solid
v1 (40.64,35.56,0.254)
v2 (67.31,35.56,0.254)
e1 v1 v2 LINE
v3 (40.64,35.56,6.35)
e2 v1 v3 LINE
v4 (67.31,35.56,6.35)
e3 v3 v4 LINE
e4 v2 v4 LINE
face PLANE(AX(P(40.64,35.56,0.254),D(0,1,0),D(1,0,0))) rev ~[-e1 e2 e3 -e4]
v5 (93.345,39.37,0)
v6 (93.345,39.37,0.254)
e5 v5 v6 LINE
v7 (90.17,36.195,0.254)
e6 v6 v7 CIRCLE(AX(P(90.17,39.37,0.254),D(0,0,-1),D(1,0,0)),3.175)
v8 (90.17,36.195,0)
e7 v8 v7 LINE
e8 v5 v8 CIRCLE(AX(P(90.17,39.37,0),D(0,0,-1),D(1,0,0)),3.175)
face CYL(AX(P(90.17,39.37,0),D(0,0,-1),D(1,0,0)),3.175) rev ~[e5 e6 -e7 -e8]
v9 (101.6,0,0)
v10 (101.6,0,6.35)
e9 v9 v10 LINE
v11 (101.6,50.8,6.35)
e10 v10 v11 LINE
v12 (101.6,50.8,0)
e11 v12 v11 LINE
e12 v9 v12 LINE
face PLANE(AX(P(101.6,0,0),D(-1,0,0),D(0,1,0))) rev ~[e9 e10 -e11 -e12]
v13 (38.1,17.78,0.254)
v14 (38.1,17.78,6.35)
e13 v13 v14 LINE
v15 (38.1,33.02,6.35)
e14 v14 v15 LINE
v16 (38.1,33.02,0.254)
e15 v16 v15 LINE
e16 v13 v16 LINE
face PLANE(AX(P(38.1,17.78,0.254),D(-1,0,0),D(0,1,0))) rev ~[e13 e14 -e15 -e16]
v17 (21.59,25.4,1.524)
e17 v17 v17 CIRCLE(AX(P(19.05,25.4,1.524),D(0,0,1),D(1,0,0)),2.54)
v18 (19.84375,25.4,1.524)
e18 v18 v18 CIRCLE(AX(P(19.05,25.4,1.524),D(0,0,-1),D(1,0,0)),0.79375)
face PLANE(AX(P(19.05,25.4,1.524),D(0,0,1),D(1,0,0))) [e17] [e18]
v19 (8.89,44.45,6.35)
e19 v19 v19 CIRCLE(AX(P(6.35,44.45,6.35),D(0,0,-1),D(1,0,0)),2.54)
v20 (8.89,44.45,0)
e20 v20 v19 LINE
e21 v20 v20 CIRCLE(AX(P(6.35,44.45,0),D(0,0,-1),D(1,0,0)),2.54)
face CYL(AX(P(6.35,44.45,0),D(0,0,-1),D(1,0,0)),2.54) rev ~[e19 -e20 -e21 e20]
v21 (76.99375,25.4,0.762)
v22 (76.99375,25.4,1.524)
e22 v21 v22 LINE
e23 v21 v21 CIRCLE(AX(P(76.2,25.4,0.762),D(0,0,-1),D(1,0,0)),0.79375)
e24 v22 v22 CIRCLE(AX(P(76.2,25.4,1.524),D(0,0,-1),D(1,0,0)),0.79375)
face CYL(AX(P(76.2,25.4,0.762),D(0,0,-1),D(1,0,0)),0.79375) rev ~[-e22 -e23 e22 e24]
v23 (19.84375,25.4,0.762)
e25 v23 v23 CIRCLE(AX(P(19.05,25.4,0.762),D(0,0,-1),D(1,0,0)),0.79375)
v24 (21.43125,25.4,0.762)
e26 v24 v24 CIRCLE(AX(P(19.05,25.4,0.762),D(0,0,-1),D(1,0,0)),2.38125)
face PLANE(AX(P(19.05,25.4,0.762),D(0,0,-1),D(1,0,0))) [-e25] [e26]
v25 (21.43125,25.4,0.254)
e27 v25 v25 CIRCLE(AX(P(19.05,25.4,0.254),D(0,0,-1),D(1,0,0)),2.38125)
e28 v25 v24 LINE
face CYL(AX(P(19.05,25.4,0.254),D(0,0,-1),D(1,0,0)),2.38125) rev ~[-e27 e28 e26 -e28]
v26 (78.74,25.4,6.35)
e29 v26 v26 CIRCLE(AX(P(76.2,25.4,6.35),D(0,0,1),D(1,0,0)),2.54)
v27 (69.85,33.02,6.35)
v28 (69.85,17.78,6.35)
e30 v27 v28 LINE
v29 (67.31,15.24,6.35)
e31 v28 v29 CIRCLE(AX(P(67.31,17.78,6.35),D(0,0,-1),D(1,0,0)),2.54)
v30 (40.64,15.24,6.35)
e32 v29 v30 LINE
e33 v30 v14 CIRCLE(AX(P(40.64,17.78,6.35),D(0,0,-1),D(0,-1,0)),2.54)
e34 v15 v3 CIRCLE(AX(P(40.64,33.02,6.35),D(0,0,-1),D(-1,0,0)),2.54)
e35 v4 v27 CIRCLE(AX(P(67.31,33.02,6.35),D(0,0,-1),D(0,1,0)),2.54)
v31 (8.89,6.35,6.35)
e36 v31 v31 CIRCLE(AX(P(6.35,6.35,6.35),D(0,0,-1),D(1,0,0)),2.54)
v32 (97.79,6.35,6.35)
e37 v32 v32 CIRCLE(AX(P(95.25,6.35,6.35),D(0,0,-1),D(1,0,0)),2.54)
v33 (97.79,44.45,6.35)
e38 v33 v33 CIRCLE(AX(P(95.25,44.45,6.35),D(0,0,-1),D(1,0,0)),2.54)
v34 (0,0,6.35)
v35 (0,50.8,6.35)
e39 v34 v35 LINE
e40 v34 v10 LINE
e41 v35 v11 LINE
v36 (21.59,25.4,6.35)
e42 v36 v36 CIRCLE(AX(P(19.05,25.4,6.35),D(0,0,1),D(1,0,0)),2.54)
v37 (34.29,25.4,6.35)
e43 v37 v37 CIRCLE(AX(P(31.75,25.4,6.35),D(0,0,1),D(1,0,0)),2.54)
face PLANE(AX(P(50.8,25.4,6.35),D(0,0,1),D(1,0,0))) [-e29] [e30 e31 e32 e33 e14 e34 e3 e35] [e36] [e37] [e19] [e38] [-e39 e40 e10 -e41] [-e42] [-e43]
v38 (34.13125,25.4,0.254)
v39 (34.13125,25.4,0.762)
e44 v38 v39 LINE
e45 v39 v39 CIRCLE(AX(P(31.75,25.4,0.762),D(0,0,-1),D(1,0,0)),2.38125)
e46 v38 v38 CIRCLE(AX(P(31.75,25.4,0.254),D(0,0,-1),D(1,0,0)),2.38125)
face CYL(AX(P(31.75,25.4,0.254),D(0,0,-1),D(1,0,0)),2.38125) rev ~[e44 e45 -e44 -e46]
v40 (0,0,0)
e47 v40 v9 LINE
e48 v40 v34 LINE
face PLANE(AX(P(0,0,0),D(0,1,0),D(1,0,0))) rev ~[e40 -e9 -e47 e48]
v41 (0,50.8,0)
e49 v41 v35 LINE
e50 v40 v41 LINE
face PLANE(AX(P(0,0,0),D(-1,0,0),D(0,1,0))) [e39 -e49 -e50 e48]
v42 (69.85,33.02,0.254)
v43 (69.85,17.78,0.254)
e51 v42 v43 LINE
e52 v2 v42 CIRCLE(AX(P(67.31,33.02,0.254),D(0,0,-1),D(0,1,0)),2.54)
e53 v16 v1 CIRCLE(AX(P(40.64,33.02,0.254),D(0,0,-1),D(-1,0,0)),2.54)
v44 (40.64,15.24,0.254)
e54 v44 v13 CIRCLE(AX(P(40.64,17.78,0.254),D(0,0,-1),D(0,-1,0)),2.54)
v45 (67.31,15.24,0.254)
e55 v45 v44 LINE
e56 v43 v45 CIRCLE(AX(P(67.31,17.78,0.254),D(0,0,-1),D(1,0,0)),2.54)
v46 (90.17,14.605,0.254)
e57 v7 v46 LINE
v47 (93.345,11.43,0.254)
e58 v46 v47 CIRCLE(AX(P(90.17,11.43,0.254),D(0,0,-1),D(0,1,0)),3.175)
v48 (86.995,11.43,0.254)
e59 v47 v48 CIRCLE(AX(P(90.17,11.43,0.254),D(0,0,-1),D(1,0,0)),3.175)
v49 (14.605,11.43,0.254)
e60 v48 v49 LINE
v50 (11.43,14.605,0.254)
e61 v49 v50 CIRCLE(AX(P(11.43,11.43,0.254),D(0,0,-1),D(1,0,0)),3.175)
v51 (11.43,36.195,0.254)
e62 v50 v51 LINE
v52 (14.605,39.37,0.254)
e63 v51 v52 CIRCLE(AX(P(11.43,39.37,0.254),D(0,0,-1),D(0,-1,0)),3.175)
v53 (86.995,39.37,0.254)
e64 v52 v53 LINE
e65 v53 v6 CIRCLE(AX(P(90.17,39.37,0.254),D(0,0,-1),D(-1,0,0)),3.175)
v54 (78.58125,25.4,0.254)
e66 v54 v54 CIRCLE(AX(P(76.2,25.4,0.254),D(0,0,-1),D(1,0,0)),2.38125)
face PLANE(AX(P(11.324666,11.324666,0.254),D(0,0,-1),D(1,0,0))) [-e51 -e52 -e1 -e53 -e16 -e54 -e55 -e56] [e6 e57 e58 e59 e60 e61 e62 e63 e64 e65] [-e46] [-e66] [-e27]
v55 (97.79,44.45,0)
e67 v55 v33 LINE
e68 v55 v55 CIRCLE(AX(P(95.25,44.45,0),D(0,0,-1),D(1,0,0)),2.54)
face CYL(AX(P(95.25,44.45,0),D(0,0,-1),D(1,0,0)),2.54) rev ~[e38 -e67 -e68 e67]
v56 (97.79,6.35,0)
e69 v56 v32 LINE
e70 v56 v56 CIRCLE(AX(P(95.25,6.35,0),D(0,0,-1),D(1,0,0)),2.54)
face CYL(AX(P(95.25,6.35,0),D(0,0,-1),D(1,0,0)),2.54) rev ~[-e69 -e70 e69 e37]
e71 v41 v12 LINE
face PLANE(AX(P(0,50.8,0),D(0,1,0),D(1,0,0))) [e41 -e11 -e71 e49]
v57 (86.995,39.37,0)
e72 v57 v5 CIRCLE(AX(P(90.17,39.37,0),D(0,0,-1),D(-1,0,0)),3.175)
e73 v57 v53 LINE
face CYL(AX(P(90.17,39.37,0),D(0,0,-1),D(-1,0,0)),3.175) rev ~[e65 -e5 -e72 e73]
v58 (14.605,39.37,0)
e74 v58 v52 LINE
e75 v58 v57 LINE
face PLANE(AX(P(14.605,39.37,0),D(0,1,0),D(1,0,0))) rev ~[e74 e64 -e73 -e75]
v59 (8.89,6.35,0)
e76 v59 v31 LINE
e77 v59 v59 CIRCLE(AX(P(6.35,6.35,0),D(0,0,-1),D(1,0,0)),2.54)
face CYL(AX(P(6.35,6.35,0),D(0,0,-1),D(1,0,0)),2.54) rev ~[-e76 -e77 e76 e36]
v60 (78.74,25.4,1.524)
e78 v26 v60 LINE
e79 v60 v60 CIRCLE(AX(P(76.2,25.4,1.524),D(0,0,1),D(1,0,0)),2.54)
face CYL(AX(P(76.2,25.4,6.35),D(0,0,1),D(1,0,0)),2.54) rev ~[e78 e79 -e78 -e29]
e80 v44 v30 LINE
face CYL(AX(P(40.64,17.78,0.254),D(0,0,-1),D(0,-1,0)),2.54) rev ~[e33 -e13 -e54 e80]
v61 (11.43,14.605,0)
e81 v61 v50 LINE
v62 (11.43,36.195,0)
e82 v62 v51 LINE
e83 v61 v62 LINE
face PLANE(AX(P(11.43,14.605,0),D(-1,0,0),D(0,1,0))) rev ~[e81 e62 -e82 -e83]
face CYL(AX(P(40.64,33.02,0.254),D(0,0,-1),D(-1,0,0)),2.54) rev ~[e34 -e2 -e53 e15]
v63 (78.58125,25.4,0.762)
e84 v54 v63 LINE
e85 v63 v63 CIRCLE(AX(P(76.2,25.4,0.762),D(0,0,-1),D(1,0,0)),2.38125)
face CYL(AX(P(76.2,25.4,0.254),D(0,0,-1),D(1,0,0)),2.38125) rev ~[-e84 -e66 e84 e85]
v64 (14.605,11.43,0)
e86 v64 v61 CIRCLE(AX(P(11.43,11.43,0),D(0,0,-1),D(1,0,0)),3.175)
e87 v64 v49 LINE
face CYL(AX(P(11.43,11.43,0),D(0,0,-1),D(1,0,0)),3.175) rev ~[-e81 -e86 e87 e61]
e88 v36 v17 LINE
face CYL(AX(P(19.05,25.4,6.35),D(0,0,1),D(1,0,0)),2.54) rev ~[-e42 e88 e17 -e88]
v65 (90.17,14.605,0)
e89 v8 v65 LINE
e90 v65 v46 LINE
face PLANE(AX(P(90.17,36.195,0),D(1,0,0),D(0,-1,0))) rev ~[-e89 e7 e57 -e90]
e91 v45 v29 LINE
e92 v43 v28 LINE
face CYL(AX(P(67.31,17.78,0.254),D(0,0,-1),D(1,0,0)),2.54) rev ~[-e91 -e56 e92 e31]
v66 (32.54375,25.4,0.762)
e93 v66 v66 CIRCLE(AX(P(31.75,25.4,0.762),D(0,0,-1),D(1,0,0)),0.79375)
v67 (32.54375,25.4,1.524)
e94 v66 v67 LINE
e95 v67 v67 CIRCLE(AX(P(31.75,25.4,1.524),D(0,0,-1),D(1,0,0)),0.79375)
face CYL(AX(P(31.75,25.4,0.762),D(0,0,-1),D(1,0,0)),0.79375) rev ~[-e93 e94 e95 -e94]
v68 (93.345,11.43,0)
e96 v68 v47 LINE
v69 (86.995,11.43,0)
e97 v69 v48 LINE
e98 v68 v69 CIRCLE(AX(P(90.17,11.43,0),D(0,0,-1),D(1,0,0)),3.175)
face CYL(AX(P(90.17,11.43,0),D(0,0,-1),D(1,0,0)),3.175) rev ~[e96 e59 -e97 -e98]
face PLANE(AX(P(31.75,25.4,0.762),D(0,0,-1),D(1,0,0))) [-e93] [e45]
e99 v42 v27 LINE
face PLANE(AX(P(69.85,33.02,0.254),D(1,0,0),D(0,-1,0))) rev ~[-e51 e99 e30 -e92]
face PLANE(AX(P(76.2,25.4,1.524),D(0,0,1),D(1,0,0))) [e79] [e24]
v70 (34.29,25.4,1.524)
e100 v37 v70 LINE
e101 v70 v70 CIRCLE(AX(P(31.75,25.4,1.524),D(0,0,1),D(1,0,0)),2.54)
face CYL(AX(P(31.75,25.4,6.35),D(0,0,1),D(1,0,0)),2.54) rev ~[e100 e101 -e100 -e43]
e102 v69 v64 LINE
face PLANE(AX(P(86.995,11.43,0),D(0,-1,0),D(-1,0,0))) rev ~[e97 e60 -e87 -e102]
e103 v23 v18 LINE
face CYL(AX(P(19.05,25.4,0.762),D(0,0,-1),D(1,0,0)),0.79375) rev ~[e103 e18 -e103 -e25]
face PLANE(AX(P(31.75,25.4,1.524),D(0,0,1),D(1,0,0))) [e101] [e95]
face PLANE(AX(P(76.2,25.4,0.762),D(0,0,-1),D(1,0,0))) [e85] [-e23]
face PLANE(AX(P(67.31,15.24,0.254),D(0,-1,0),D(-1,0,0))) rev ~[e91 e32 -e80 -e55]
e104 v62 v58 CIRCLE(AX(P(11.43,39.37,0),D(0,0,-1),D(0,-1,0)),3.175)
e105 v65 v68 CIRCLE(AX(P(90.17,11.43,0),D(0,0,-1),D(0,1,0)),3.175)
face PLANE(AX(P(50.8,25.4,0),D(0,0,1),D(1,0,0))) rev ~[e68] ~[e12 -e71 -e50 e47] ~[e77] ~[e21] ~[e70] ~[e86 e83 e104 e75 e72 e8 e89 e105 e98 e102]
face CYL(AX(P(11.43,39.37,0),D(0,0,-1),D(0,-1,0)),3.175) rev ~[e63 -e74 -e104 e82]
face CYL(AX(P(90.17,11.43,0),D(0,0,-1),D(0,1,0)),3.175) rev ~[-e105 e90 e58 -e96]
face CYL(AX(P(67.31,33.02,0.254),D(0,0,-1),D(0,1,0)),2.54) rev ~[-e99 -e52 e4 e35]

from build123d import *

# Parameters (mm, degrees)
F0_W      = 101.6
F0_H      = 50.8
F1_DEPTH  = 6.35
F3_DEPTH  = 0.254
F4_R      = 2.54
F5_DEPTH  = 6.351
F6_R      = 2.38125
F7_DEPTH  = 0.508
F8_R      = 0.79375
F9_DEPTH  = 1.27
F10_R     = 2.54
F11_DEPTH = 4.826
F13_DEPTH = 6.096


# Not quite as in the source:
# - a feature names something its author has since deleted; it is built from what else it names


with BuildPart() as f1:
    # F0 (on Top) → F1 (new body)
    with BuildSketch(Plane.XY):
        with Locations((50.8, 25.4)):
            Rectangle(F0_W, F0_H)
    extrude(amount=F1_DEPTH)

    # F2 (on face) → F3 (cut)
    with BuildSketch(Plane(origin=(0, 0, 0), x_dir=(1, 0, 0), z_dir=(0, 0, -1))):
        with BuildLine():
            Line((11.43, -14.605), (11.43, -11.43))
            Line((11.43, -11.43), (14.605, -11.43))
            ThreePointArc((14.605, -11.43), (9.1849359697, -9.1849359697), (11.43, -14.605))
        make_face()
        with BuildLine():
            Line((14.605, -11.43), (11.43, -11.43))
            Line((11.43, -11.43), (11.43, -14.605))
            ThreePointArc((11.43, -14.605), (13.6750640303, -13.6750640303), (14.605, -11.43))
        make_face()
        with BuildLine():
            Line((86.995, -11.43), (14.605, -11.43))
            ThreePointArc((14.605, -11.43), (13.6750640303, -13.6750640303), (11.43, -14.605))
            Line((11.43, -14.605), (11.43, -36.195))
            ThreePointArc((11.43, -36.195), (13.6750640303, -37.1249359697), (14.605, -39.37))
            Line((14.605, -39.37), (86.995, -39.37))
            ThreePointArc((86.995, -39.37), (87.9249359697, -37.1249359697), (90.17, -36.195))
            Line((90.17, -36.195), (90.17, -14.605))
            ThreePointArc((90.17, -14.605), (87.9249359697, -13.6750640303), (86.995, -11.43))
        make_face()
        with BuildLine():
            ThreePointArc((93.345, -11.43), (90.17, -8.255), (86.995, -11.43))
            Line((86.995, -11.43), (90.17, -11.43))
            Line((90.17, -11.43), (90.17, -14.605))
            ThreePointArc((90.17, -14.605), (92.4150640303, -13.6750640303), (93.345, -11.43))
        make_face()
        with BuildLine():
            Line((90.17, -11.43), (86.995, -11.43))
            ThreePointArc((86.995, -11.43), (87.9249359697, -13.6750640303), (90.17, -14.605))
            Line((90.17, -14.605), (90.17, -11.43))
        make_face()
        with BuildLine():
            ThreePointArc((14.605, -39.37), (13.6750640303, -37.1249359697), (11.43, -36.195))
            Line((11.43, -36.195), (11.43, -39.37))
            Line((11.43, -39.37), (14.605, -39.37))
        make_face()
        with BuildLine():
            Line((11.43, -39.37), (11.43, -36.195))
            ThreePointArc((11.43, -36.195), (9.1849359697, -41.6150640303), (14.605, -39.37))
            Line((14.605, -39.37), (11.43, -39.37))
        make_face()
        with BuildLine():
            ThreePointArc((93.345, -39.37), (92.4150640303, -37.1249359697), (90.17, -36.195))
            Line((90.17, -36.195), (90.17, -39.37))
            Line((90.17, -39.37), (86.995, -39.37))
            ThreePointArc((86.995, -39.37), (90.17, -42.545), (93.345, -39.37))
        make_face()
        with BuildLine():
            Line((90.17, -39.37), (90.17, -36.195))
            ThreePointArc((90.17, -36.195), (87.9249359697, -37.1249359697), (86.995, -39.37))
            Line((86.995, -39.37), (90.17, -39.37))
        make_face()
    extrude(amount=-F3_DEPTH, mode=Mode.SUBTRACT)

    # F4 (on face) → F5 (cut, through all)
    with BuildSketch(Plane(origin=(0, 0, 0), x_dir=(1, 0, 0), z_dir=(0, 0, -1))):
        with Locations((95.25, -6.35)):
            Circle(F4_R)
        with Locations((6.35, -6.35)):
            Circle(F4_R)
        with Locations((6.35, -44.45)):
            Circle(F4_R)
        with Locations((95.25, -44.45)):
            Circle(F4_R)
    extrude(amount=-F5_DEPTH, mode=Mode.SUBTRACT)

    # F6 (on face) → F7 (cut)
    with BuildSketch(Plane(origin=(0, 0, 0.254), x_dir=(1, 0, 0), z_dir=(0, 0, -1))):
        with Locations((31.75, -25.4)):
            Circle(F6_R)
        with Locations((19.05, -25.4)):
            Circle(F6_R)
        with Locations((76.2, -25.4)):
            Circle(F6_R)
    extrude(amount=-F7_DEPTH, mode=Mode.SUBTRACT)

    # F8 (on face) → F9 (cut)
    with BuildSketch(Plane(origin=(0, 0, 0.762), x_dir=(1, 0, 0), z_dir=(0, 0, -1))):
        with Locations((19.05, -25.4)):
            Circle(F8_R)
        with Locations((31.75, -25.4)):
            Circle(F8_R)
        with Locations((76.2, -25.4)):
            Circle(F8_R)
    extrude(amount=-F9_DEPTH, mode=Mode.SUBTRACT)

    # F10 (on face) → F11 (cut)
    with BuildSketch(Plane.XY.offset(6.35)):
        with Locations((19.05, 25.4)):
            Circle(F10_R)
        with Locations((31.75, 25.4)):
            Circle(F10_R)
        with Locations((76.2, 25.4)):
            Circle(F10_R)
    extrude(amount=-F11_DEPTH, mode=Mode.SUBTRACT)

    # F12 (on face) → F13 (cut, through all)
    with BuildSketch(Plane(origin=(0, 0, 0.254), x_dir=(1, 0, 0), z_dir=(0, 0, -1))):
        with BuildLine():
            Line((67.31, -15.24), (40.64, -15.24))
            ThreePointArc((40.64, -15.24), (38.8439487758, -15.9839487758), (38.1, -17.78))
            Line((38.1, -17.78), (38.1, -33.02))
            ThreePointArc((38.1, -33.02), (38.8439487758, -34.8160512242), (40.64, -35.56))
            Line((40.64, -35.56), (67.31, -35.56))
            ThreePointArc((67.31, -35.56), (69.1060512242, -34.8160512242), (69.85, -33.02))
            Line((69.85, -33.02), (69.85, -17.78))
            ThreePointArc((69.85, -17.78), (69.1060512242, -15.9839487758), (67.31, -15.24))
        make_face()
    extrude(amount=-F13_DEPTH, mode=Mode.SUBTRACT)


solid = f1.part
